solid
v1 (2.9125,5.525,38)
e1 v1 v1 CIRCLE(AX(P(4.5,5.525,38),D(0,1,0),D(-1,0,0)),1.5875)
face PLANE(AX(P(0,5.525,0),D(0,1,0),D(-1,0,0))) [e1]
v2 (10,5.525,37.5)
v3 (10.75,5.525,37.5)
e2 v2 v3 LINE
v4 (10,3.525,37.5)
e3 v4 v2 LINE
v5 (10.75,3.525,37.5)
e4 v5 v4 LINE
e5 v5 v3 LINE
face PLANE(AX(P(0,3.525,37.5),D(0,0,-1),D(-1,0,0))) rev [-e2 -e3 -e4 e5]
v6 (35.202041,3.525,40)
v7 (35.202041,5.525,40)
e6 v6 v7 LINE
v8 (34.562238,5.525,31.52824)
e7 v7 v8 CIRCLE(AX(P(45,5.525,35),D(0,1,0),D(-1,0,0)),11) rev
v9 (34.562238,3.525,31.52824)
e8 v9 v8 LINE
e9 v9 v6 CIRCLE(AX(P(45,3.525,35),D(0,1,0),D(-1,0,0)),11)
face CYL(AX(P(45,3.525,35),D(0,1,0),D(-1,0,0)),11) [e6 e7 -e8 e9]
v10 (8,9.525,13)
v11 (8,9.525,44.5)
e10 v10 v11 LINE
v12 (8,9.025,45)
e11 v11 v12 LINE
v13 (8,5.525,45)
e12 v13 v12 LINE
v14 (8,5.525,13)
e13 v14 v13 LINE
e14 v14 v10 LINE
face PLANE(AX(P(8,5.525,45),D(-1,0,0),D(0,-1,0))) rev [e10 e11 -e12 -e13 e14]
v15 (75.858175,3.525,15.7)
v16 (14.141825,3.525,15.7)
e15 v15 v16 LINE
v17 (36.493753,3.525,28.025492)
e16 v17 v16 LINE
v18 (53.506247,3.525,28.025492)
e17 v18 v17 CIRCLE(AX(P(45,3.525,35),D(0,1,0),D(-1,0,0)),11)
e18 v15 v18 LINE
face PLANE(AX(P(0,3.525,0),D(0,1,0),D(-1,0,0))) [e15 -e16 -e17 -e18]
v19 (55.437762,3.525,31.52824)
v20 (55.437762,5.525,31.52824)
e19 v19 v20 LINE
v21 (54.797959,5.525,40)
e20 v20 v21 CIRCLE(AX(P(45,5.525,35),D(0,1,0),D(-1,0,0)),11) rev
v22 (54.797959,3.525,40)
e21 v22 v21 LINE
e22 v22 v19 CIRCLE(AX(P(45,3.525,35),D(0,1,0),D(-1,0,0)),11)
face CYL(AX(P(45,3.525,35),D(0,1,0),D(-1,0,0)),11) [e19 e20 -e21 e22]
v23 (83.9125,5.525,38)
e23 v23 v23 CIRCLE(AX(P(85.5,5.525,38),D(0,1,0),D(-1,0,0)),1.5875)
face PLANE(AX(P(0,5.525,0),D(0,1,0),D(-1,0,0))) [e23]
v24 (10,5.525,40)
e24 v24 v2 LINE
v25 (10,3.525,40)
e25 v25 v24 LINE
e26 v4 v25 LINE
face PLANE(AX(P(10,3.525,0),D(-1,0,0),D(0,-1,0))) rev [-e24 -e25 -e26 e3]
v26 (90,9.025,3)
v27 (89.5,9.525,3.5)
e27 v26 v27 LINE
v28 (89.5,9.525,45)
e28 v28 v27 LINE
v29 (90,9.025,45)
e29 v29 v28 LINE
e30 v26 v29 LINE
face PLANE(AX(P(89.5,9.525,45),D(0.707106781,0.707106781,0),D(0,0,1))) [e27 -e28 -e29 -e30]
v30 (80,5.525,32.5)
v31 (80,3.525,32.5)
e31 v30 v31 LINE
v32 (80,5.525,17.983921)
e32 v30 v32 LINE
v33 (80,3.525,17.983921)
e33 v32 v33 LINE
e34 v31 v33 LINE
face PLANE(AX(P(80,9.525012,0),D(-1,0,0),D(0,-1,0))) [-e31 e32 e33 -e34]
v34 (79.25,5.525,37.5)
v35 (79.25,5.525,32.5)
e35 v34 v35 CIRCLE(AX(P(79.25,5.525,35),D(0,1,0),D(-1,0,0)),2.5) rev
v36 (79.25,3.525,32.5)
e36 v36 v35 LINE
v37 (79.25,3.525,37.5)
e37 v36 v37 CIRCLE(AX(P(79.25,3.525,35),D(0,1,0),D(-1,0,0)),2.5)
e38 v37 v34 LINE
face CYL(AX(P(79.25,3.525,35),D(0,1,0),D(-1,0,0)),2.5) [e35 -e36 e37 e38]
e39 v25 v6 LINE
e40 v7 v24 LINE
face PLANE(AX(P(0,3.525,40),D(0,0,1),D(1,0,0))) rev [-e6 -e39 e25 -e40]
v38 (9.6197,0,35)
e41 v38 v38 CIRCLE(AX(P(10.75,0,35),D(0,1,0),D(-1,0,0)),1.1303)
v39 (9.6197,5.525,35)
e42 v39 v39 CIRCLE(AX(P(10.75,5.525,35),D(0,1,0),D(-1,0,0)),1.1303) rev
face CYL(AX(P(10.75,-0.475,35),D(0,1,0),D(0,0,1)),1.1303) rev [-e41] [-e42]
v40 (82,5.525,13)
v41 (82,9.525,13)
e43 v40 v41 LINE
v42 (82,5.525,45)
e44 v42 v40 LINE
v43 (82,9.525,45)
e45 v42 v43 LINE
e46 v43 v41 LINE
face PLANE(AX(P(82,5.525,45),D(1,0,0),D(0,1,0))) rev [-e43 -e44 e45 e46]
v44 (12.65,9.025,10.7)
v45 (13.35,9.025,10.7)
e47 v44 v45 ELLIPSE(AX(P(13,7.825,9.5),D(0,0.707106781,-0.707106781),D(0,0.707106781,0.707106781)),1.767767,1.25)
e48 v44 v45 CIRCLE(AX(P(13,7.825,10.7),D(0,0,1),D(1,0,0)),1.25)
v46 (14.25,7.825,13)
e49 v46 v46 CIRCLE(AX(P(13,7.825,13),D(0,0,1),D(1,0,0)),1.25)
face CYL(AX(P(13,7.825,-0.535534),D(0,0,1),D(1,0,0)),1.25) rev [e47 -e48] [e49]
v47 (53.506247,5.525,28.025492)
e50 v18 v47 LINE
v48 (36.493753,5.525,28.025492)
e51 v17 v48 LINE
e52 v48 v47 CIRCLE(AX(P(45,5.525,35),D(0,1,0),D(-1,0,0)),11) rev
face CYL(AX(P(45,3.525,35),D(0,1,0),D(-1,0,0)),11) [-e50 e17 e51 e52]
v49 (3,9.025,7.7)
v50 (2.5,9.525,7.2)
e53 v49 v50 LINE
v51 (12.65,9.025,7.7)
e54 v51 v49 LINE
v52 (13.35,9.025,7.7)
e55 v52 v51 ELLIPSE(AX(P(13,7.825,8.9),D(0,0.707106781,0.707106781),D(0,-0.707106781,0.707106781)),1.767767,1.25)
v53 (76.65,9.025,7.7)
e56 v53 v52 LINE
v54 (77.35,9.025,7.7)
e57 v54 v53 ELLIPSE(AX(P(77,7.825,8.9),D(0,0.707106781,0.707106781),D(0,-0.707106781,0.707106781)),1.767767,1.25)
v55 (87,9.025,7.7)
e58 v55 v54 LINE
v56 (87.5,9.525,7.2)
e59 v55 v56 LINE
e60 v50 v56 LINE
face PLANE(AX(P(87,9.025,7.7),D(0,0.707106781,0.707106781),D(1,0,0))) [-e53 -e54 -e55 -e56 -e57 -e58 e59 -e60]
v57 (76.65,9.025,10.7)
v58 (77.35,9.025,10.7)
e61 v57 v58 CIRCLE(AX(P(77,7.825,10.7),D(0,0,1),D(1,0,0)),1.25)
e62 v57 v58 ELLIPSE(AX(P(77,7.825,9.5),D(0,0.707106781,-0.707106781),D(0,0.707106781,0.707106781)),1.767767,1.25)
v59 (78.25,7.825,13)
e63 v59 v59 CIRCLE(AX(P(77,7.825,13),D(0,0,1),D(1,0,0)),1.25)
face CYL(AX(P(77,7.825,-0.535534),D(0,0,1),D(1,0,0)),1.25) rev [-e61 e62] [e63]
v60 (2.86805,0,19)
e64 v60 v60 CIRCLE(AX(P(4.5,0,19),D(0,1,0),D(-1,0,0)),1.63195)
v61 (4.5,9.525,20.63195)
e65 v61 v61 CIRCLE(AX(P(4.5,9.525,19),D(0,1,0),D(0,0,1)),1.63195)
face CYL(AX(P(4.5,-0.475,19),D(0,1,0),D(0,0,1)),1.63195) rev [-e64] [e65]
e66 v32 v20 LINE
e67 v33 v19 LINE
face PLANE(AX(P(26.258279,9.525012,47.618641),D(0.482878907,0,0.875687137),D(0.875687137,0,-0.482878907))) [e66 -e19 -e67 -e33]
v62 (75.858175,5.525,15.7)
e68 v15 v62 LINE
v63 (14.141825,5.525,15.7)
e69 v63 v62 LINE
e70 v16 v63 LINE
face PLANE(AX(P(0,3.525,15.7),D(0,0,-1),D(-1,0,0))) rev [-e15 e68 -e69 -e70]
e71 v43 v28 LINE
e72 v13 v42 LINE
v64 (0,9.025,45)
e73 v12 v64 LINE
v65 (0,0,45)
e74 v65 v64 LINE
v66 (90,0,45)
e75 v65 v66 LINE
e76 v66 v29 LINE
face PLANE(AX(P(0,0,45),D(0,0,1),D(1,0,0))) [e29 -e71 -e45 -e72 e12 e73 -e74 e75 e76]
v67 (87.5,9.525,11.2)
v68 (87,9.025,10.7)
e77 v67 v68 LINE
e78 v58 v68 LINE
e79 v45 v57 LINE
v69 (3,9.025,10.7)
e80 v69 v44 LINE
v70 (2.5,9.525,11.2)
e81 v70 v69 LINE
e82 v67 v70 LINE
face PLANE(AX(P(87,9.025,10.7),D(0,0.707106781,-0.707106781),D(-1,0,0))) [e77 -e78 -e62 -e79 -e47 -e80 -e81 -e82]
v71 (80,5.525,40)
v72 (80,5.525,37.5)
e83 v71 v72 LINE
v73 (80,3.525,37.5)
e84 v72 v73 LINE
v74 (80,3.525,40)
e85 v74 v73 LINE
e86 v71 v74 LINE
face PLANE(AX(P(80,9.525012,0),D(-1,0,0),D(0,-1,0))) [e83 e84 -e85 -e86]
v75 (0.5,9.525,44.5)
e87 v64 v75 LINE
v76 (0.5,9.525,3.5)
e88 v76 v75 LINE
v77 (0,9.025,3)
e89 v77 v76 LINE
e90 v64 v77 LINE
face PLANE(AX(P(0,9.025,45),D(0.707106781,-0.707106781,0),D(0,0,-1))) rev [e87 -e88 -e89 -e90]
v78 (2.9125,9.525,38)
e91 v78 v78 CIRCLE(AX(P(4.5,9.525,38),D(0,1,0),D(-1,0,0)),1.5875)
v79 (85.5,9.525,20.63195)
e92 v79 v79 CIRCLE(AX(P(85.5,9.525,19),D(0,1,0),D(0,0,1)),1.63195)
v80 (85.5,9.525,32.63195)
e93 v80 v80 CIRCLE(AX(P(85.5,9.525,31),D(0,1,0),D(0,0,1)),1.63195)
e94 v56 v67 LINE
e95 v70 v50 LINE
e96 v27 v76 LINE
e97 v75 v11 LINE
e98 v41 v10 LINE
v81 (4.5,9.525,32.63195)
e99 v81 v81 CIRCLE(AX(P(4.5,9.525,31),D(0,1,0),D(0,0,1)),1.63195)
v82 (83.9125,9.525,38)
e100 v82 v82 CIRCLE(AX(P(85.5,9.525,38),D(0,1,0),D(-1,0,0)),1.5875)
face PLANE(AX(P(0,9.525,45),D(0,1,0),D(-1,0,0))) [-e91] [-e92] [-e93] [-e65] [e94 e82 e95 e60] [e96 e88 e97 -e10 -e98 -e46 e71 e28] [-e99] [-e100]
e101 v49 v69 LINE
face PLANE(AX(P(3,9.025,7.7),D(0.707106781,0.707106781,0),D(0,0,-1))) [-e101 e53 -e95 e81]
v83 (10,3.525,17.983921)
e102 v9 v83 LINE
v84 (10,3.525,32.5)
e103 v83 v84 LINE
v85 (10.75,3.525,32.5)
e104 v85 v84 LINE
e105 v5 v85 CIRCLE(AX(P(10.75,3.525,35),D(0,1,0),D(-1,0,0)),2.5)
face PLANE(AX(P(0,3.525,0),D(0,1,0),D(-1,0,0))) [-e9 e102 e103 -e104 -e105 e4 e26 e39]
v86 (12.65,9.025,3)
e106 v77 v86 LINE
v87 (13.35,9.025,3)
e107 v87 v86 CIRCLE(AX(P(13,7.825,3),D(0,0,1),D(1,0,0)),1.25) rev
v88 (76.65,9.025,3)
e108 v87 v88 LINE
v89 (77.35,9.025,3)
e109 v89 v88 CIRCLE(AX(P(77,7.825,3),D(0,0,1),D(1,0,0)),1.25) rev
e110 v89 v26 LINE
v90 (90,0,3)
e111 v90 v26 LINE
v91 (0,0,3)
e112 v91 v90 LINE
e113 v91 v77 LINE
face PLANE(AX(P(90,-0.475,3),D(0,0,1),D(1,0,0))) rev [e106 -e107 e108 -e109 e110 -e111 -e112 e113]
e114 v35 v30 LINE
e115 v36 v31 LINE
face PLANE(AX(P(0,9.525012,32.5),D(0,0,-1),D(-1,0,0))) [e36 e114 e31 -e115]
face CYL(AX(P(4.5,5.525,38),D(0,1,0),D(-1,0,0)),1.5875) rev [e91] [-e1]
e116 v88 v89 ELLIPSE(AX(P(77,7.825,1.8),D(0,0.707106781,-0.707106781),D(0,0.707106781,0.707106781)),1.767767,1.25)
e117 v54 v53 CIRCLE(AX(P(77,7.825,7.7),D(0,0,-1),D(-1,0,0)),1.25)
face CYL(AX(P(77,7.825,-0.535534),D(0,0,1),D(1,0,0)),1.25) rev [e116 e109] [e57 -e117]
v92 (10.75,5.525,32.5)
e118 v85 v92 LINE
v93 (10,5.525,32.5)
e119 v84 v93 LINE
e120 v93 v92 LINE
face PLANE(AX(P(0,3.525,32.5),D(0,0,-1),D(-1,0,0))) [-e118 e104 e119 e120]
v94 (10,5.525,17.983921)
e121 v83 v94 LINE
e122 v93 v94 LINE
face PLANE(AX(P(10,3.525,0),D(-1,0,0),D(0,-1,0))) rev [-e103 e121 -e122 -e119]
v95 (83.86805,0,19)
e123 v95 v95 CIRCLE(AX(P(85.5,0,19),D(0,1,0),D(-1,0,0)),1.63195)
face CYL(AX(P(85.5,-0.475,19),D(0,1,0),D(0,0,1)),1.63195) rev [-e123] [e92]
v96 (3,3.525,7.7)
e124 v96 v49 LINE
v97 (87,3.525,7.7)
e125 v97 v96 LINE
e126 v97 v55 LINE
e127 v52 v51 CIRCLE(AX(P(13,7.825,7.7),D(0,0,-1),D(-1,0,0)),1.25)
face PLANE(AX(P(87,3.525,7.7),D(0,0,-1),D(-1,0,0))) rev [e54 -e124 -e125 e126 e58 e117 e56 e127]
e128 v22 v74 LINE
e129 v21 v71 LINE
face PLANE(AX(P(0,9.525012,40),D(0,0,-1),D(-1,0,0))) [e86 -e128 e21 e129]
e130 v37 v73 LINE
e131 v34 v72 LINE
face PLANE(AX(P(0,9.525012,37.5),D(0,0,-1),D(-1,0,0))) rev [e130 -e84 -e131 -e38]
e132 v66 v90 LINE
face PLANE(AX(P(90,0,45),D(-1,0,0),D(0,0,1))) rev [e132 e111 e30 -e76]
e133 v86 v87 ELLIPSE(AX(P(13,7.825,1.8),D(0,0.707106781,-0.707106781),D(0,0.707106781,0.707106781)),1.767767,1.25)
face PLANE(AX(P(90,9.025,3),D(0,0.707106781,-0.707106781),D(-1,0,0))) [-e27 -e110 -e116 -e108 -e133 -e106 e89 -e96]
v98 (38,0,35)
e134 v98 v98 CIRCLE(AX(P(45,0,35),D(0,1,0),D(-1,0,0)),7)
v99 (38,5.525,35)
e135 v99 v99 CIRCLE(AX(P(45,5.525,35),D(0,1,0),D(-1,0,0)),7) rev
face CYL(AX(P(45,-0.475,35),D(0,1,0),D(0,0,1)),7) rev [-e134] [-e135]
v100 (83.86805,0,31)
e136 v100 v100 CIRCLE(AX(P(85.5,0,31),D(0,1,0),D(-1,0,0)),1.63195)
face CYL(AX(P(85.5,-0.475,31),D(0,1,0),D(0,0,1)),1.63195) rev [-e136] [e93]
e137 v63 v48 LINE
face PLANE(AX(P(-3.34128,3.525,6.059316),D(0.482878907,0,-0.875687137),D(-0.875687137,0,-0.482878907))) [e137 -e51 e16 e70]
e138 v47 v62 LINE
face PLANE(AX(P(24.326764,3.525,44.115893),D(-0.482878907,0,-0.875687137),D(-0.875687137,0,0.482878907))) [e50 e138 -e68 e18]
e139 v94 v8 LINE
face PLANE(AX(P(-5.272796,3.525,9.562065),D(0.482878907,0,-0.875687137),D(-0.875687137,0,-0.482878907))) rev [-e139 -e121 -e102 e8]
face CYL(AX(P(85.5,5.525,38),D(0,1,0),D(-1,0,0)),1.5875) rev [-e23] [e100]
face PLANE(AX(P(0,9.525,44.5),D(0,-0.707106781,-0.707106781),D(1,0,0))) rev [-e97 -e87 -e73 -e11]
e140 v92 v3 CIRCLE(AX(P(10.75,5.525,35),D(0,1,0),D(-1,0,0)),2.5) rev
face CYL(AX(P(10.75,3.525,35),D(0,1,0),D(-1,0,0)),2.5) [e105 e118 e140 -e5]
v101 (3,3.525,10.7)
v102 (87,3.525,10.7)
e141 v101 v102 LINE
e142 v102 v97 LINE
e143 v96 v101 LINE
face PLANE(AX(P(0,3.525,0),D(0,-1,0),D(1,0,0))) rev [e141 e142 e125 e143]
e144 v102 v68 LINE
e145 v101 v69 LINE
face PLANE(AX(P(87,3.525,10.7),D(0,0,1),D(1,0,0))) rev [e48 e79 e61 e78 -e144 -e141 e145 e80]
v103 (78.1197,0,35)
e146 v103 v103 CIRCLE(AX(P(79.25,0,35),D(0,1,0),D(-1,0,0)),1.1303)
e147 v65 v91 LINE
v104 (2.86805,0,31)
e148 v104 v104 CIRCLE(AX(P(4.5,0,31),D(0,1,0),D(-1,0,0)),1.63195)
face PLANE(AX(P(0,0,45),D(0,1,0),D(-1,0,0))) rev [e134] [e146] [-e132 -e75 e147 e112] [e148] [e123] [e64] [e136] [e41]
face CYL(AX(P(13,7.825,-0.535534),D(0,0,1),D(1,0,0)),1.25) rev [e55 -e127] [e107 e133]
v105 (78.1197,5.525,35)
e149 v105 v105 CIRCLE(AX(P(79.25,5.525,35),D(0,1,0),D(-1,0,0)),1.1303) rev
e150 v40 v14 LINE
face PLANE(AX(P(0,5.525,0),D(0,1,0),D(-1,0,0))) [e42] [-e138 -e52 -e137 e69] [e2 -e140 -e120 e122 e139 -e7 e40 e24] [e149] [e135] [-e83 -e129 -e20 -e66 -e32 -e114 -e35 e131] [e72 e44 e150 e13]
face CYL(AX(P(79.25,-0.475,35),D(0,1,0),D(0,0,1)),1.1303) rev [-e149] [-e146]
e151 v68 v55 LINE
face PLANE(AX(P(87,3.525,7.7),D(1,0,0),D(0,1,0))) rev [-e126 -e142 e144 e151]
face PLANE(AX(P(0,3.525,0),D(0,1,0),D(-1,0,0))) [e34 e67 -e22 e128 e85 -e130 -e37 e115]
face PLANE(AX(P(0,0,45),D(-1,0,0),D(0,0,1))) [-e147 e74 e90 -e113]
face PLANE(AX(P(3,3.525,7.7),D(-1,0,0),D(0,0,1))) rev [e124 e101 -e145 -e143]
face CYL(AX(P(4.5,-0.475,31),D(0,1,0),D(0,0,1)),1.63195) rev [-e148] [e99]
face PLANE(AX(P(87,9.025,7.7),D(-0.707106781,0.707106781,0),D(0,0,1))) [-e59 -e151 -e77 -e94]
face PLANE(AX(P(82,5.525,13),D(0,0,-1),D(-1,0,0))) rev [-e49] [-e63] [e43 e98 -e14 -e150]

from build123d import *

# Parameters (mm, degrees)
SKETCH1_W               = 90
SKETCH1_H               = 9.525
SKETCH1_R               = 2
BOSS_EXTRUDE1_DEPTH     = 45
SKETCH2_R               = 7
CUT_EXTRUDE2_DEPTH      = 10
SKETCH3_R               = 1.63195
SKETCH3_R_2             = 7
SKETCH3_R_3             = 1.1303
CUT_EXTRUDE3_DEPTH      = 10
SKETCH4_W               = 84
SKETCH4_H               = 3
CUT_EXTRUDE4_DEPTH      = 6
CUT_EXTRUDE6_DEPTH      = 102.072872844
CUT_EXTRUDE6_DEPTH_BACK = 6
SKETCH7_W               = 90
SKETCH7_H               = 3
CUT_EXTRUDE7_DEPTH      = 10
SKETCH9_W               = 74
SKETCH9_H               = 32
CUT_EXTRUDE8_DEPTH      = 4
CUT_EXTRUDE9_REACH      = 97.993
SKETCH10_R              = 1.25
CHAMFER2_SIZE           = 0.5
SKETCH11_R              = 1.5875
CUT_EXTRUDE10_DEPTH     = 4


with BuildPart() as part:
    # Sketch1 → Boss-Extrude1 (new body)
    # profile 1 of 3: a face of its own
    with BuildSketch(Plane.XY):
        with Locations((45, 4.7625)):
            Rectangle(SKETCH1_W, SKETCH1_H)
        with Locations((60, 4.7625)):
            Circle(SKETCH1_R, mode=Mode.SUBTRACT)
        with Locations((30, 4.7625)):
            Circle(SKETCH1_R, mode=Mode.SUBTRACT)
    # profile 2 of 3: a face of its own
    with BuildSketch(Plane.XY):
        with Locations((30, 4.7625)):
            Circle(SKETCH1_R)
    # profile 3 of 3: a face of its own
    with BuildSketch(Plane.XY):
        with Locations((60, 4.7625)):
            Circle(SKETCH1_R)
    extrude(amount=BOSS_EXTRUDE1_DEPTH)

    # Sketch2 → Cut-Extrude2 (cut)
    with BuildSketch(Plane(origin=(0, 9.525, 0), x_dir=(1, 0, 0), z_dir=(0, 1, 0))):
        with Locations(Location((45, -35, 0), (0, 0, 270))):
            Circle(SKETCH2_R)
    extrude(amount=-CUT_EXTRUDE2_DEPTH, mode=Mode.SUBTRACT)

    # Sketch3 → Cut-Extrude3 (cut)
    with BuildSketch(Plane(origin=(0, 9.525, 0), x_dir=(1, 0, 0), z_dir=(0, 1, 0))):
        with Locations(Location((85.5, -31, 0), (0, 0, 270))):
            Circle(SKETCH3_R)
        with Locations(Location((4.5, -31, 0), (0, 0, 270))):
            Circle(SKETCH3_R)
        with Locations(Location((45, -35, 0), (0, 0, 270))):
            Circle(SKETCH3_R_2)
        with Locations(Location((85.5, -19, 0), (0, 0, 270))):
            Circle(SKETCH3_R)
        with Locations(Location((4.5, -19, 0), (0, 0, 270))):
            Circle(SKETCH3_R)
        with Locations(Location((79.25, -35, 0), (0, 0, 270))):
            Circle(SKETCH3_R_3)
        with Locations(Location((10.75, -35, 0), (0, 0, 270))):
            Circle(SKETCH3_R_3)
    extrude(amount=-CUT_EXTRUDE3_DEPTH, mode=Mode.SUBTRACT)

    # Sketch4 → Cut-Extrude4 (cut)
    with BuildSketch(Plane(origin=(0, 9.525, 0), x_dir=(1, 0, 0), z_dir=(0, 1, 0))):
        with Locations((45, -9.2)):
            Rectangle(SKETCH4_W, SKETCH4_H)
    extrude(amount=-CUT_EXTRUDE4_DEPTH, mode=Mode.SUBTRACT)

    # Sketch6 → Cut-Extrude6 (cut, two sides: drawn at the far end of the back side and taken through both)
    with BuildSketch(Plane(origin=(0, 9.525, 0), x_dir=(1, 0, 0), z_dir=(0, 1, 0)).offset(-CUT_EXTRUDE6_DEPTH_BACK)):
        with BuildLine():
            ThreePointArc((10.75, -32.5), (13.25, -35), (10.75, -37.5))
            Line((10.75, -37.5), (10, -37.5))
            Line((10, -37.5), (10, -40))
            Line((10, -40), (35.202041029, -40))
            ThreePointArc((35.202041029, -40), (34.031236019, -35.828381989), (34.562237569, -31.528240298))
            Line((34.562237569, -31.528240298), (10, -17.983920725))
            Line((10, -17.983920725), (10, -32.5))
            Line((10, -32.5), (10.75, -32.5))
        make_face()
        with BuildLine():
            Line((14.141825149, -15.7), (36.493753196, -28.025491752))
            ThreePointArc((36.493753196, -28.025491752), (45, -24), (53.506246804, -28.025491752))
            Line((53.506246804, -28.025491752), (75.858174851, -15.7))
            Line((75.858174851, -15.7), (14.141825149, -15.7))
        make_face()
        with BuildLine():
            ThreePointArc((55.437762431, -31.528240298), (55.968763981, -35.828381989), (54.797958971, -40))
            Line((54.797958971, -40), (80, -40))
            Line((80, -40), (80, -37.5))
            Line((80, -37.5), (79.25, -37.5))
            ThreePointArc((79.25, -37.5), (76.75, -35), (79.25, -32.5))
            Line((79.25, -32.5), (80, -32.5))
            Line((80, -32.5), (80, -17.983920725))
            Line((80, -17.983920725), (55.437762431, -31.528240298))
        make_face()
    extrude(amount=CUT_EXTRUDE6_DEPTH + CUT_EXTRUDE6_DEPTH_BACK, mode=Mode.SUBTRACT)

    # Sketch7 → Cut-Extrude7 (cut)
    with BuildSketch(Plane(origin=(0, 9.525, 0), x_dir=(1, 0, 0), z_dir=(0, 1, 0))):
        with Locations((45, -1.5)):
            Rectangle(SKETCH7_W, SKETCH7_H)
    extrude(amount=-CUT_EXTRUDE7_DEPTH, mode=Mode.SUBTRACT)

    # Sketch9 → Cut-Extrude8 (cut)
    with BuildSketch(Plane(origin=(0, 9.525, 0), x_dir=(1, 0, 0), z_dir=(0, 1, 0))):
        with Locations((45, -29)):
            Rectangle(SKETCH9_W, SKETCH9_H)
    extrude(amount=-CUT_EXTRUDE8_DEPTH, mode=Mode.SUBTRACT)

    # Cut-Extrude9: up to this face of the body (flat: up to its plane)
    cut_extrude9_end = Plane(part.part.faces().sort_by_distance((45, 4.7625, 3))[0])
    # Sketch10 → Cut-Extrude9 (cut, up to the picked face)
    with BuildSketch(Plane.XY.offset(13), mode=Mode.PRIVATE) as cut_extrude9_sk1:
        with Locations((77, 7.825)):
            Circle(SKETCH10_R)
    cut_extrude9_tool1 = split(extrude(cut_extrude9_sk1.sketch, amount=-CUT_EXTRUDE9_REACH, mode=Mode.PRIVATE), bisect_by=cut_extrude9_end, keep=Keep.BOTH, mode=Mode.PRIVATE)
    # Sketch10 → Cut-Extrude9 (cut, up to the picked face)
    with BuildSketch(Plane.XY.offset(13), mode=Mode.PRIVATE) as cut_extrude9_sk2:
        with Locations((13, 7.825)):
            Circle(SKETCH10_R)
    cut_extrude9_tool2 = split(extrude(cut_extrude9_sk2.sketch, amount=-CUT_EXTRUDE9_REACH, mode=Mode.PRIVATE), bisect_by=cut_extrude9_end, keep=Keep.BOTH, mode=Mode.PRIVATE)
    add(cut_extrude9_tool1.solids().sort_by(Axis((77, 7.825, 13), (0, 0, -1)))[0], mode=Mode.SUBTRACT)
    add(cut_extrude9_tool2.solids().sort_by(Axis((13, 7.825, 13), (0, 0, -1)))[0], mode=Mode.SUBTRACT)

    # Chamfer2
    # the kernel refuses this chamfer: 0.5 mm, written as the material it takes off along each edge
    with BuildSketch(Plane(origin=(9.285841494, 9.525, 45), x_dir=(0, -0.999621916911297, 0.0274958766105822), z_dir=(-1, 0, 0))) as chamfer2_piece_1:
        Polygon((CHAMFER2_SIZE * 0.999621916911, -CHAMFER2_SIZE * 0.0274958766106), (-CHAMFER2_SIZE * 0.0274958766106, -CHAMFER2_SIZE * 0.999621916911), (0, 0), align=None)
    extrude(amount=10.571682988, mode=Mode.SUBTRACT)
    with BuildSketch(Plane(origin=(-1.285841494, 9.525, 3), x_dir=(0, -0.9996219169112968, -0.02749587661058651), z_dir=(1, 0, 0))) as chamfer2_piece_2:
        Polygon((CHAMFER2_SIZE * 0.999621916911, -CHAMFER2_SIZE * 0.0274958766106), (-CHAMFER2_SIZE * 0.0274958766106, -CHAMFER2_SIZE * 0.999621916911), (0, 0), align=None)
    extrude(amount=92.571682988, mode=Mode.SUBTRACT)
    with BuildSketch(Plane(origin=(87, 9.525, 10.7), x_dir=(0.999621916911297, 0.027495876610582292, 0), z_dir=(0, 0, -1)), Plane(origin=(3, 9.525, 7.7), x_dir=(-0.9996219169112968, 0.027495876610585408, -1.1837901526131803e-15), z_dir=(0, 0, 1))) as chamfer2_piece_3:
        Polygon((CHAMFER2_SIZE * 0.999621916911, CHAMFER2_SIZE * 0.0274958766106), (-CHAMFER2_SIZE * 0.0274958766106, CHAMFER2_SIZE * 0.999621916911), (0, 0), align=None)
    extrude(amount=3, mode=Mode.SUBTRACT)
    with BuildSketch(Plane(origin=(87, 9.525, 7.7), x_dir=(0, 0.0274958766105822, -0.999621916911297), z_dir=(-1, 0, 0)), Plane(origin=(3, 9.525, 10.7), x_dir=(0, 0.027495876610585647, 0.9996219169112968), z_dir=(1, 0, 0))) as chamfer2_piece_4:
        Polygon((CHAMFER2_SIZE * 0.999621916911, CHAMFER2_SIZE * 0.0274958766106), (-CHAMFER2_SIZE * 0.0274958766106, CHAMFER2_SIZE * 0.999621916911), (0, 0), align=None)
    extrude(amount=84, mode=Mode.SUBTRACT)
    with BuildSketch(Plane(origin=(0, 9.525, 1.714158506), x_dir=(-0.02749587661058639, -0.9996219169112968, 0), z_dir=(0, 0, 1))) as chamfer2_piece_5:
        Polygon((CHAMFER2_SIZE * 0.999621916911, CHAMFER2_SIZE * 0.0274958766106), (-CHAMFER2_SIZE * 0.0274958766106, CHAMFER2_SIZE * 0.999621916911), (0, 0), align=None)
    extrude(amount=44.571682988, mode=Mode.SUBTRACT)
    with BuildSketch(Plane(origin=(90, 9.525, 1.714158506), x_dir=(0.0274958766105822, -0.999621916911297, 0), z_dir=(0, 0, 1))) as chamfer2_piece_6:
        Polygon((CHAMFER2_SIZE * 0.999621916911, -CHAMFER2_SIZE * 0.0274958766106), (-CHAMFER2_SIZE * 0.0274958766106, -CHAMFER2_SIZE * 0.999621916911), (0, 0), align=None)
    extrude(amount=44.571682988, mode=Mode.SUBTRACT)
    with BuildSketch(Plane(origin=(87, 9.525, 11.985841494), x_dir=(0.9996219169112968, 0.02749587661058574, 0), z_dir=(0, 0, -1))) as chamfer2_piece_7a_section:
        Polygon((CHAMFER2_SIZE * 0.999621916911, CHAMFER2_SIZE * 0.0274958766106), (-CHAMFER2_SIZE * 0.0274958766106, CHAMFER2_SIZE * 0.999621916911), (0, 0), align=None)
    chamfer2_piece_7a = extrude(amount=4.285841494, mode=Mode.PRIVATE)
    chamfer2_piece_7a = split(chamfer2_piece_7a, bisect_by=Plane(origin=(87.164896813, 9.360103187, 10.7), z_dir=(0, 0, 1)), keep=Keep.TOP, mode=Mode.PRIVATE)
    with BuildSketch(Plane(origin=(3, 9.525, 10.7), x_dir=(0, 0.027495876610585647, 0.9996219169112968), z_dir=(1, 0, 0))) as chamfer2_piece_7b_section:
        Polygon((CHAMFER2_SIZE * 0.999621916911, CHAMFER2_SIZE * 0.0274958766106), (-CHAMFER2_SIZE * 0.0274958766106, CHAMFER2_SIZE * 0.999621916911), (0, 0), align=None)
    chamfer2_piece_7b = extrude(amount=85.285841494, mode=Mode.PRIVATE)
    chamfer2_piece_7b = split(chamfer2_piece_7b, bisect_by=Plane(origin=(87, 9.360103187, 10.864896813), z_dir=(1, 0, 0)), keep=Keep.TOP, mode=Mode.PRIVATE)
    chamfer2_piece_7 = chamfer2_piece_7a & chamfer2_piece_7b
    add(chamfer2_piece_7, mode=Mode.SUBTRACT)
    with BuildSketch(Plane(origin=(87, 9.525, 10.7), x_dir=(0.999621916911297, 0.027495876610582292, 0), z_dir=(0, 0, -1))) as chamfer2_piece_8a_section:
        Polygon((CHAMFER2_SIZE * 0.999621916911, CHAMFER2_SIZE * 0.0274958766106), (-CHAMFER2_SIZE * 0.0274958766106, CHAMFER2_SIZE * 0.999621916911), (0, 0), align=None)
    chamfer2_piece_8a = extrude(amount=4.285841494, mode=Mode.PRIVATE)
    chamfer2_piece_8a = split(chamfer2_piece_8a, bisect_by=Plane(origin=(87.164896813, 9.360103187, 7.7), z_dir=(0, 0, -1)), keep=Keep.TOP, mode=Mode.PRIVATE)
    with BuildSketch(Plane(origin=(88.285841494, 9.525, 7.7), x_dir=(0, 0.027495876610585647, -0.9996219169112968), z_dir=(-1, 0, 0))) as chamfer2_piece_8b_section:
        Polygon((CHAMFER2_SIZE * 0.999621916911, CHAMFER2_SIZE * 0.0274958766106), (-CHAMFER2_SIZE * 0.0274958766106, CHAMFER2_SIZE * 0.999621916911), (0, 0), align=None)
    chamfer2_piece_8b = extrude(amount=85.285841494, mode=Mode.PRIVATE)
    chamfer2_piece_8b = split(chamfer2_piece_8b, bisect_by=Plane(origin=(87, 9.360103187, 7.535103187), z_dir=(1, 0, 0)), keep=Keep.TOP, mode=Mode.PRIVATE)
    chamfer2_piece_8 = chamfer2_piece_8a & chamfer2_piece_8b
    add(chamfer2_piece_8, mode=Mode.SUBTRACT)
    with BuildSketch(Plane(origin=(87, 9.525, 7.7), x_dir=(0, 0.0274958766105822, -0.999621916911297), z_dir=(-1, 0, 0))) as chamfer2_piece_9a_section:
        Polygon((CHAMFER2_SIZE * 0.999621916911, CHAMFER2_SIZE * 0.0274958766106), (-CHAMFER2_SIZE * 0.0274958766106, CHAMFER2_SIZE * 0.999621916911), (0, 0), align=None)
    chamfer2_piece_9a = extrude(amount=85.285841494, mode=Mode.PRIVATE)
    chamfer2_piece_9a = split(chamfer2_piece_9a, bisect_by=Plane(origin=(3, 9.360103187, 7.535103187), z_dir=(-1, 0, 0)), keep=Keep.TOP, mode=Mode.PRIVATE)
    with BuildSketch(Plane(origin=(3, 9.525, 6.414158506), x_dir=(-0.9996219169112968, 0.027495876610585623, -1.1837901526131803e-15), z_dir=(0, 0, 1))) as chamfer2_piece_9b_section:
        Polygon((CHAMFER2_SIZE * 0.999621916911, CHAMFER2_SIZE * 0.0274958766106), (-CHAMFER2_SIZE * 0.0274958766106, CHAMFER2_SIZE * 0.999621916911), (0, 0), align=None)
    chamfer2_piece_9b = extrude(amount=4.285841494, mode=Mode.PRIVATE)
    chamfer2_piece_9b = split(chamfer2_piece_9b, bisect_by=Plane(origin=(2.835103187, 9.360103187, 7.7), z_dir=(0, 0, -1)), keep=Keep.TOP, mode=Mode.PRIVATE)
    chamfer2_piece_9 = chamfer2_piece_9a & chamfer2_piece_9b
    add(chamfer2_piece_9, mode=Mode.SUBTRACT)
    with BuildSketch(Plane(origin=(1.714158506, 9.525, 10.7), x_dir=(0, 0.027495876610585647, 0.9996219169112968), z_dir=(1, 0, 0))) as chamfer2_piece_10a_section:
        Polygon((CHAMFER2_SIZE * 0.999621916911, CHAMFER2_SIZE * 0.0274958766106), (-CHAMFER2_SIZE * 0.0274958766106, CHAMFER2_SIZE * 0.999621916911), (0, 0), align=None)
    chamfer2_piece_10a = extrude(amount=85.285841494, mode=Mode.PRIVATE)
    chamfer2_piece_10a = split(chamfer2_piece_10a, bisect_by=Plane(origin=(3, 9.360103187, 10.864896813), z_dir=(-1, 0, 0)), keep=Keep.TOP, mode=Mode.PRIVATE)
    with BuildSketch(Plane(origin=(3, 9.525, 7.7), x_dir=(-0.9996219169112968, 0.027495876610585408, -1.1837901526131803e-15), z_dir=(0, 0, 1))) as chamfer2_piece_10b_section:
        Polygon((CHAMFER2_SIZE * 0.999621916911, CHAMFER2_SIZE * 0.0274958766106), (-CHAMFER2_SIZE * 0.0274958766106, CHAMFER2_SIZE * 0.999621916911), (0, 0), align=None)
    chamfer2_piece_10b = extrude(amount=4.285841494, mode=Mode.PRIVATE)
    chamfer2_piece_10b = split(chamfer2_piece_10b, bisect_by=Plane(origin=(2.835103187, 9.360103187, 10.7), z_dir=(0, 0, 1)), keep=Keep.TOP, mode=Mode.PRIVATE)
    chamfer2_piece_10 = chamfer2_piece_10a & chamfer2_piece_10b
    add(chamfer2_piece_10, mode=Mode.SUBTRACT)

    # Sketch11 → Cut-Extrude10 (cut)
    with BuildSketch(Plane(origin=(0, 9.525, 0), x_dir=(1, 0, 0), z_dir=(0, 1, 0))):
        with Locations(Location((85.5, -38, 0), (0, 0, 180))):
            Circle(SKETCH11_R)
        with Locations(Location((4.5, -38, 0), (0, 0, 180))):
            Circle(SKETCH11_R)
    extrude(amount=-CUT_EXTRUDE10_DEPTH, mode=Mode.SUBTRACT)


solid = part.part
